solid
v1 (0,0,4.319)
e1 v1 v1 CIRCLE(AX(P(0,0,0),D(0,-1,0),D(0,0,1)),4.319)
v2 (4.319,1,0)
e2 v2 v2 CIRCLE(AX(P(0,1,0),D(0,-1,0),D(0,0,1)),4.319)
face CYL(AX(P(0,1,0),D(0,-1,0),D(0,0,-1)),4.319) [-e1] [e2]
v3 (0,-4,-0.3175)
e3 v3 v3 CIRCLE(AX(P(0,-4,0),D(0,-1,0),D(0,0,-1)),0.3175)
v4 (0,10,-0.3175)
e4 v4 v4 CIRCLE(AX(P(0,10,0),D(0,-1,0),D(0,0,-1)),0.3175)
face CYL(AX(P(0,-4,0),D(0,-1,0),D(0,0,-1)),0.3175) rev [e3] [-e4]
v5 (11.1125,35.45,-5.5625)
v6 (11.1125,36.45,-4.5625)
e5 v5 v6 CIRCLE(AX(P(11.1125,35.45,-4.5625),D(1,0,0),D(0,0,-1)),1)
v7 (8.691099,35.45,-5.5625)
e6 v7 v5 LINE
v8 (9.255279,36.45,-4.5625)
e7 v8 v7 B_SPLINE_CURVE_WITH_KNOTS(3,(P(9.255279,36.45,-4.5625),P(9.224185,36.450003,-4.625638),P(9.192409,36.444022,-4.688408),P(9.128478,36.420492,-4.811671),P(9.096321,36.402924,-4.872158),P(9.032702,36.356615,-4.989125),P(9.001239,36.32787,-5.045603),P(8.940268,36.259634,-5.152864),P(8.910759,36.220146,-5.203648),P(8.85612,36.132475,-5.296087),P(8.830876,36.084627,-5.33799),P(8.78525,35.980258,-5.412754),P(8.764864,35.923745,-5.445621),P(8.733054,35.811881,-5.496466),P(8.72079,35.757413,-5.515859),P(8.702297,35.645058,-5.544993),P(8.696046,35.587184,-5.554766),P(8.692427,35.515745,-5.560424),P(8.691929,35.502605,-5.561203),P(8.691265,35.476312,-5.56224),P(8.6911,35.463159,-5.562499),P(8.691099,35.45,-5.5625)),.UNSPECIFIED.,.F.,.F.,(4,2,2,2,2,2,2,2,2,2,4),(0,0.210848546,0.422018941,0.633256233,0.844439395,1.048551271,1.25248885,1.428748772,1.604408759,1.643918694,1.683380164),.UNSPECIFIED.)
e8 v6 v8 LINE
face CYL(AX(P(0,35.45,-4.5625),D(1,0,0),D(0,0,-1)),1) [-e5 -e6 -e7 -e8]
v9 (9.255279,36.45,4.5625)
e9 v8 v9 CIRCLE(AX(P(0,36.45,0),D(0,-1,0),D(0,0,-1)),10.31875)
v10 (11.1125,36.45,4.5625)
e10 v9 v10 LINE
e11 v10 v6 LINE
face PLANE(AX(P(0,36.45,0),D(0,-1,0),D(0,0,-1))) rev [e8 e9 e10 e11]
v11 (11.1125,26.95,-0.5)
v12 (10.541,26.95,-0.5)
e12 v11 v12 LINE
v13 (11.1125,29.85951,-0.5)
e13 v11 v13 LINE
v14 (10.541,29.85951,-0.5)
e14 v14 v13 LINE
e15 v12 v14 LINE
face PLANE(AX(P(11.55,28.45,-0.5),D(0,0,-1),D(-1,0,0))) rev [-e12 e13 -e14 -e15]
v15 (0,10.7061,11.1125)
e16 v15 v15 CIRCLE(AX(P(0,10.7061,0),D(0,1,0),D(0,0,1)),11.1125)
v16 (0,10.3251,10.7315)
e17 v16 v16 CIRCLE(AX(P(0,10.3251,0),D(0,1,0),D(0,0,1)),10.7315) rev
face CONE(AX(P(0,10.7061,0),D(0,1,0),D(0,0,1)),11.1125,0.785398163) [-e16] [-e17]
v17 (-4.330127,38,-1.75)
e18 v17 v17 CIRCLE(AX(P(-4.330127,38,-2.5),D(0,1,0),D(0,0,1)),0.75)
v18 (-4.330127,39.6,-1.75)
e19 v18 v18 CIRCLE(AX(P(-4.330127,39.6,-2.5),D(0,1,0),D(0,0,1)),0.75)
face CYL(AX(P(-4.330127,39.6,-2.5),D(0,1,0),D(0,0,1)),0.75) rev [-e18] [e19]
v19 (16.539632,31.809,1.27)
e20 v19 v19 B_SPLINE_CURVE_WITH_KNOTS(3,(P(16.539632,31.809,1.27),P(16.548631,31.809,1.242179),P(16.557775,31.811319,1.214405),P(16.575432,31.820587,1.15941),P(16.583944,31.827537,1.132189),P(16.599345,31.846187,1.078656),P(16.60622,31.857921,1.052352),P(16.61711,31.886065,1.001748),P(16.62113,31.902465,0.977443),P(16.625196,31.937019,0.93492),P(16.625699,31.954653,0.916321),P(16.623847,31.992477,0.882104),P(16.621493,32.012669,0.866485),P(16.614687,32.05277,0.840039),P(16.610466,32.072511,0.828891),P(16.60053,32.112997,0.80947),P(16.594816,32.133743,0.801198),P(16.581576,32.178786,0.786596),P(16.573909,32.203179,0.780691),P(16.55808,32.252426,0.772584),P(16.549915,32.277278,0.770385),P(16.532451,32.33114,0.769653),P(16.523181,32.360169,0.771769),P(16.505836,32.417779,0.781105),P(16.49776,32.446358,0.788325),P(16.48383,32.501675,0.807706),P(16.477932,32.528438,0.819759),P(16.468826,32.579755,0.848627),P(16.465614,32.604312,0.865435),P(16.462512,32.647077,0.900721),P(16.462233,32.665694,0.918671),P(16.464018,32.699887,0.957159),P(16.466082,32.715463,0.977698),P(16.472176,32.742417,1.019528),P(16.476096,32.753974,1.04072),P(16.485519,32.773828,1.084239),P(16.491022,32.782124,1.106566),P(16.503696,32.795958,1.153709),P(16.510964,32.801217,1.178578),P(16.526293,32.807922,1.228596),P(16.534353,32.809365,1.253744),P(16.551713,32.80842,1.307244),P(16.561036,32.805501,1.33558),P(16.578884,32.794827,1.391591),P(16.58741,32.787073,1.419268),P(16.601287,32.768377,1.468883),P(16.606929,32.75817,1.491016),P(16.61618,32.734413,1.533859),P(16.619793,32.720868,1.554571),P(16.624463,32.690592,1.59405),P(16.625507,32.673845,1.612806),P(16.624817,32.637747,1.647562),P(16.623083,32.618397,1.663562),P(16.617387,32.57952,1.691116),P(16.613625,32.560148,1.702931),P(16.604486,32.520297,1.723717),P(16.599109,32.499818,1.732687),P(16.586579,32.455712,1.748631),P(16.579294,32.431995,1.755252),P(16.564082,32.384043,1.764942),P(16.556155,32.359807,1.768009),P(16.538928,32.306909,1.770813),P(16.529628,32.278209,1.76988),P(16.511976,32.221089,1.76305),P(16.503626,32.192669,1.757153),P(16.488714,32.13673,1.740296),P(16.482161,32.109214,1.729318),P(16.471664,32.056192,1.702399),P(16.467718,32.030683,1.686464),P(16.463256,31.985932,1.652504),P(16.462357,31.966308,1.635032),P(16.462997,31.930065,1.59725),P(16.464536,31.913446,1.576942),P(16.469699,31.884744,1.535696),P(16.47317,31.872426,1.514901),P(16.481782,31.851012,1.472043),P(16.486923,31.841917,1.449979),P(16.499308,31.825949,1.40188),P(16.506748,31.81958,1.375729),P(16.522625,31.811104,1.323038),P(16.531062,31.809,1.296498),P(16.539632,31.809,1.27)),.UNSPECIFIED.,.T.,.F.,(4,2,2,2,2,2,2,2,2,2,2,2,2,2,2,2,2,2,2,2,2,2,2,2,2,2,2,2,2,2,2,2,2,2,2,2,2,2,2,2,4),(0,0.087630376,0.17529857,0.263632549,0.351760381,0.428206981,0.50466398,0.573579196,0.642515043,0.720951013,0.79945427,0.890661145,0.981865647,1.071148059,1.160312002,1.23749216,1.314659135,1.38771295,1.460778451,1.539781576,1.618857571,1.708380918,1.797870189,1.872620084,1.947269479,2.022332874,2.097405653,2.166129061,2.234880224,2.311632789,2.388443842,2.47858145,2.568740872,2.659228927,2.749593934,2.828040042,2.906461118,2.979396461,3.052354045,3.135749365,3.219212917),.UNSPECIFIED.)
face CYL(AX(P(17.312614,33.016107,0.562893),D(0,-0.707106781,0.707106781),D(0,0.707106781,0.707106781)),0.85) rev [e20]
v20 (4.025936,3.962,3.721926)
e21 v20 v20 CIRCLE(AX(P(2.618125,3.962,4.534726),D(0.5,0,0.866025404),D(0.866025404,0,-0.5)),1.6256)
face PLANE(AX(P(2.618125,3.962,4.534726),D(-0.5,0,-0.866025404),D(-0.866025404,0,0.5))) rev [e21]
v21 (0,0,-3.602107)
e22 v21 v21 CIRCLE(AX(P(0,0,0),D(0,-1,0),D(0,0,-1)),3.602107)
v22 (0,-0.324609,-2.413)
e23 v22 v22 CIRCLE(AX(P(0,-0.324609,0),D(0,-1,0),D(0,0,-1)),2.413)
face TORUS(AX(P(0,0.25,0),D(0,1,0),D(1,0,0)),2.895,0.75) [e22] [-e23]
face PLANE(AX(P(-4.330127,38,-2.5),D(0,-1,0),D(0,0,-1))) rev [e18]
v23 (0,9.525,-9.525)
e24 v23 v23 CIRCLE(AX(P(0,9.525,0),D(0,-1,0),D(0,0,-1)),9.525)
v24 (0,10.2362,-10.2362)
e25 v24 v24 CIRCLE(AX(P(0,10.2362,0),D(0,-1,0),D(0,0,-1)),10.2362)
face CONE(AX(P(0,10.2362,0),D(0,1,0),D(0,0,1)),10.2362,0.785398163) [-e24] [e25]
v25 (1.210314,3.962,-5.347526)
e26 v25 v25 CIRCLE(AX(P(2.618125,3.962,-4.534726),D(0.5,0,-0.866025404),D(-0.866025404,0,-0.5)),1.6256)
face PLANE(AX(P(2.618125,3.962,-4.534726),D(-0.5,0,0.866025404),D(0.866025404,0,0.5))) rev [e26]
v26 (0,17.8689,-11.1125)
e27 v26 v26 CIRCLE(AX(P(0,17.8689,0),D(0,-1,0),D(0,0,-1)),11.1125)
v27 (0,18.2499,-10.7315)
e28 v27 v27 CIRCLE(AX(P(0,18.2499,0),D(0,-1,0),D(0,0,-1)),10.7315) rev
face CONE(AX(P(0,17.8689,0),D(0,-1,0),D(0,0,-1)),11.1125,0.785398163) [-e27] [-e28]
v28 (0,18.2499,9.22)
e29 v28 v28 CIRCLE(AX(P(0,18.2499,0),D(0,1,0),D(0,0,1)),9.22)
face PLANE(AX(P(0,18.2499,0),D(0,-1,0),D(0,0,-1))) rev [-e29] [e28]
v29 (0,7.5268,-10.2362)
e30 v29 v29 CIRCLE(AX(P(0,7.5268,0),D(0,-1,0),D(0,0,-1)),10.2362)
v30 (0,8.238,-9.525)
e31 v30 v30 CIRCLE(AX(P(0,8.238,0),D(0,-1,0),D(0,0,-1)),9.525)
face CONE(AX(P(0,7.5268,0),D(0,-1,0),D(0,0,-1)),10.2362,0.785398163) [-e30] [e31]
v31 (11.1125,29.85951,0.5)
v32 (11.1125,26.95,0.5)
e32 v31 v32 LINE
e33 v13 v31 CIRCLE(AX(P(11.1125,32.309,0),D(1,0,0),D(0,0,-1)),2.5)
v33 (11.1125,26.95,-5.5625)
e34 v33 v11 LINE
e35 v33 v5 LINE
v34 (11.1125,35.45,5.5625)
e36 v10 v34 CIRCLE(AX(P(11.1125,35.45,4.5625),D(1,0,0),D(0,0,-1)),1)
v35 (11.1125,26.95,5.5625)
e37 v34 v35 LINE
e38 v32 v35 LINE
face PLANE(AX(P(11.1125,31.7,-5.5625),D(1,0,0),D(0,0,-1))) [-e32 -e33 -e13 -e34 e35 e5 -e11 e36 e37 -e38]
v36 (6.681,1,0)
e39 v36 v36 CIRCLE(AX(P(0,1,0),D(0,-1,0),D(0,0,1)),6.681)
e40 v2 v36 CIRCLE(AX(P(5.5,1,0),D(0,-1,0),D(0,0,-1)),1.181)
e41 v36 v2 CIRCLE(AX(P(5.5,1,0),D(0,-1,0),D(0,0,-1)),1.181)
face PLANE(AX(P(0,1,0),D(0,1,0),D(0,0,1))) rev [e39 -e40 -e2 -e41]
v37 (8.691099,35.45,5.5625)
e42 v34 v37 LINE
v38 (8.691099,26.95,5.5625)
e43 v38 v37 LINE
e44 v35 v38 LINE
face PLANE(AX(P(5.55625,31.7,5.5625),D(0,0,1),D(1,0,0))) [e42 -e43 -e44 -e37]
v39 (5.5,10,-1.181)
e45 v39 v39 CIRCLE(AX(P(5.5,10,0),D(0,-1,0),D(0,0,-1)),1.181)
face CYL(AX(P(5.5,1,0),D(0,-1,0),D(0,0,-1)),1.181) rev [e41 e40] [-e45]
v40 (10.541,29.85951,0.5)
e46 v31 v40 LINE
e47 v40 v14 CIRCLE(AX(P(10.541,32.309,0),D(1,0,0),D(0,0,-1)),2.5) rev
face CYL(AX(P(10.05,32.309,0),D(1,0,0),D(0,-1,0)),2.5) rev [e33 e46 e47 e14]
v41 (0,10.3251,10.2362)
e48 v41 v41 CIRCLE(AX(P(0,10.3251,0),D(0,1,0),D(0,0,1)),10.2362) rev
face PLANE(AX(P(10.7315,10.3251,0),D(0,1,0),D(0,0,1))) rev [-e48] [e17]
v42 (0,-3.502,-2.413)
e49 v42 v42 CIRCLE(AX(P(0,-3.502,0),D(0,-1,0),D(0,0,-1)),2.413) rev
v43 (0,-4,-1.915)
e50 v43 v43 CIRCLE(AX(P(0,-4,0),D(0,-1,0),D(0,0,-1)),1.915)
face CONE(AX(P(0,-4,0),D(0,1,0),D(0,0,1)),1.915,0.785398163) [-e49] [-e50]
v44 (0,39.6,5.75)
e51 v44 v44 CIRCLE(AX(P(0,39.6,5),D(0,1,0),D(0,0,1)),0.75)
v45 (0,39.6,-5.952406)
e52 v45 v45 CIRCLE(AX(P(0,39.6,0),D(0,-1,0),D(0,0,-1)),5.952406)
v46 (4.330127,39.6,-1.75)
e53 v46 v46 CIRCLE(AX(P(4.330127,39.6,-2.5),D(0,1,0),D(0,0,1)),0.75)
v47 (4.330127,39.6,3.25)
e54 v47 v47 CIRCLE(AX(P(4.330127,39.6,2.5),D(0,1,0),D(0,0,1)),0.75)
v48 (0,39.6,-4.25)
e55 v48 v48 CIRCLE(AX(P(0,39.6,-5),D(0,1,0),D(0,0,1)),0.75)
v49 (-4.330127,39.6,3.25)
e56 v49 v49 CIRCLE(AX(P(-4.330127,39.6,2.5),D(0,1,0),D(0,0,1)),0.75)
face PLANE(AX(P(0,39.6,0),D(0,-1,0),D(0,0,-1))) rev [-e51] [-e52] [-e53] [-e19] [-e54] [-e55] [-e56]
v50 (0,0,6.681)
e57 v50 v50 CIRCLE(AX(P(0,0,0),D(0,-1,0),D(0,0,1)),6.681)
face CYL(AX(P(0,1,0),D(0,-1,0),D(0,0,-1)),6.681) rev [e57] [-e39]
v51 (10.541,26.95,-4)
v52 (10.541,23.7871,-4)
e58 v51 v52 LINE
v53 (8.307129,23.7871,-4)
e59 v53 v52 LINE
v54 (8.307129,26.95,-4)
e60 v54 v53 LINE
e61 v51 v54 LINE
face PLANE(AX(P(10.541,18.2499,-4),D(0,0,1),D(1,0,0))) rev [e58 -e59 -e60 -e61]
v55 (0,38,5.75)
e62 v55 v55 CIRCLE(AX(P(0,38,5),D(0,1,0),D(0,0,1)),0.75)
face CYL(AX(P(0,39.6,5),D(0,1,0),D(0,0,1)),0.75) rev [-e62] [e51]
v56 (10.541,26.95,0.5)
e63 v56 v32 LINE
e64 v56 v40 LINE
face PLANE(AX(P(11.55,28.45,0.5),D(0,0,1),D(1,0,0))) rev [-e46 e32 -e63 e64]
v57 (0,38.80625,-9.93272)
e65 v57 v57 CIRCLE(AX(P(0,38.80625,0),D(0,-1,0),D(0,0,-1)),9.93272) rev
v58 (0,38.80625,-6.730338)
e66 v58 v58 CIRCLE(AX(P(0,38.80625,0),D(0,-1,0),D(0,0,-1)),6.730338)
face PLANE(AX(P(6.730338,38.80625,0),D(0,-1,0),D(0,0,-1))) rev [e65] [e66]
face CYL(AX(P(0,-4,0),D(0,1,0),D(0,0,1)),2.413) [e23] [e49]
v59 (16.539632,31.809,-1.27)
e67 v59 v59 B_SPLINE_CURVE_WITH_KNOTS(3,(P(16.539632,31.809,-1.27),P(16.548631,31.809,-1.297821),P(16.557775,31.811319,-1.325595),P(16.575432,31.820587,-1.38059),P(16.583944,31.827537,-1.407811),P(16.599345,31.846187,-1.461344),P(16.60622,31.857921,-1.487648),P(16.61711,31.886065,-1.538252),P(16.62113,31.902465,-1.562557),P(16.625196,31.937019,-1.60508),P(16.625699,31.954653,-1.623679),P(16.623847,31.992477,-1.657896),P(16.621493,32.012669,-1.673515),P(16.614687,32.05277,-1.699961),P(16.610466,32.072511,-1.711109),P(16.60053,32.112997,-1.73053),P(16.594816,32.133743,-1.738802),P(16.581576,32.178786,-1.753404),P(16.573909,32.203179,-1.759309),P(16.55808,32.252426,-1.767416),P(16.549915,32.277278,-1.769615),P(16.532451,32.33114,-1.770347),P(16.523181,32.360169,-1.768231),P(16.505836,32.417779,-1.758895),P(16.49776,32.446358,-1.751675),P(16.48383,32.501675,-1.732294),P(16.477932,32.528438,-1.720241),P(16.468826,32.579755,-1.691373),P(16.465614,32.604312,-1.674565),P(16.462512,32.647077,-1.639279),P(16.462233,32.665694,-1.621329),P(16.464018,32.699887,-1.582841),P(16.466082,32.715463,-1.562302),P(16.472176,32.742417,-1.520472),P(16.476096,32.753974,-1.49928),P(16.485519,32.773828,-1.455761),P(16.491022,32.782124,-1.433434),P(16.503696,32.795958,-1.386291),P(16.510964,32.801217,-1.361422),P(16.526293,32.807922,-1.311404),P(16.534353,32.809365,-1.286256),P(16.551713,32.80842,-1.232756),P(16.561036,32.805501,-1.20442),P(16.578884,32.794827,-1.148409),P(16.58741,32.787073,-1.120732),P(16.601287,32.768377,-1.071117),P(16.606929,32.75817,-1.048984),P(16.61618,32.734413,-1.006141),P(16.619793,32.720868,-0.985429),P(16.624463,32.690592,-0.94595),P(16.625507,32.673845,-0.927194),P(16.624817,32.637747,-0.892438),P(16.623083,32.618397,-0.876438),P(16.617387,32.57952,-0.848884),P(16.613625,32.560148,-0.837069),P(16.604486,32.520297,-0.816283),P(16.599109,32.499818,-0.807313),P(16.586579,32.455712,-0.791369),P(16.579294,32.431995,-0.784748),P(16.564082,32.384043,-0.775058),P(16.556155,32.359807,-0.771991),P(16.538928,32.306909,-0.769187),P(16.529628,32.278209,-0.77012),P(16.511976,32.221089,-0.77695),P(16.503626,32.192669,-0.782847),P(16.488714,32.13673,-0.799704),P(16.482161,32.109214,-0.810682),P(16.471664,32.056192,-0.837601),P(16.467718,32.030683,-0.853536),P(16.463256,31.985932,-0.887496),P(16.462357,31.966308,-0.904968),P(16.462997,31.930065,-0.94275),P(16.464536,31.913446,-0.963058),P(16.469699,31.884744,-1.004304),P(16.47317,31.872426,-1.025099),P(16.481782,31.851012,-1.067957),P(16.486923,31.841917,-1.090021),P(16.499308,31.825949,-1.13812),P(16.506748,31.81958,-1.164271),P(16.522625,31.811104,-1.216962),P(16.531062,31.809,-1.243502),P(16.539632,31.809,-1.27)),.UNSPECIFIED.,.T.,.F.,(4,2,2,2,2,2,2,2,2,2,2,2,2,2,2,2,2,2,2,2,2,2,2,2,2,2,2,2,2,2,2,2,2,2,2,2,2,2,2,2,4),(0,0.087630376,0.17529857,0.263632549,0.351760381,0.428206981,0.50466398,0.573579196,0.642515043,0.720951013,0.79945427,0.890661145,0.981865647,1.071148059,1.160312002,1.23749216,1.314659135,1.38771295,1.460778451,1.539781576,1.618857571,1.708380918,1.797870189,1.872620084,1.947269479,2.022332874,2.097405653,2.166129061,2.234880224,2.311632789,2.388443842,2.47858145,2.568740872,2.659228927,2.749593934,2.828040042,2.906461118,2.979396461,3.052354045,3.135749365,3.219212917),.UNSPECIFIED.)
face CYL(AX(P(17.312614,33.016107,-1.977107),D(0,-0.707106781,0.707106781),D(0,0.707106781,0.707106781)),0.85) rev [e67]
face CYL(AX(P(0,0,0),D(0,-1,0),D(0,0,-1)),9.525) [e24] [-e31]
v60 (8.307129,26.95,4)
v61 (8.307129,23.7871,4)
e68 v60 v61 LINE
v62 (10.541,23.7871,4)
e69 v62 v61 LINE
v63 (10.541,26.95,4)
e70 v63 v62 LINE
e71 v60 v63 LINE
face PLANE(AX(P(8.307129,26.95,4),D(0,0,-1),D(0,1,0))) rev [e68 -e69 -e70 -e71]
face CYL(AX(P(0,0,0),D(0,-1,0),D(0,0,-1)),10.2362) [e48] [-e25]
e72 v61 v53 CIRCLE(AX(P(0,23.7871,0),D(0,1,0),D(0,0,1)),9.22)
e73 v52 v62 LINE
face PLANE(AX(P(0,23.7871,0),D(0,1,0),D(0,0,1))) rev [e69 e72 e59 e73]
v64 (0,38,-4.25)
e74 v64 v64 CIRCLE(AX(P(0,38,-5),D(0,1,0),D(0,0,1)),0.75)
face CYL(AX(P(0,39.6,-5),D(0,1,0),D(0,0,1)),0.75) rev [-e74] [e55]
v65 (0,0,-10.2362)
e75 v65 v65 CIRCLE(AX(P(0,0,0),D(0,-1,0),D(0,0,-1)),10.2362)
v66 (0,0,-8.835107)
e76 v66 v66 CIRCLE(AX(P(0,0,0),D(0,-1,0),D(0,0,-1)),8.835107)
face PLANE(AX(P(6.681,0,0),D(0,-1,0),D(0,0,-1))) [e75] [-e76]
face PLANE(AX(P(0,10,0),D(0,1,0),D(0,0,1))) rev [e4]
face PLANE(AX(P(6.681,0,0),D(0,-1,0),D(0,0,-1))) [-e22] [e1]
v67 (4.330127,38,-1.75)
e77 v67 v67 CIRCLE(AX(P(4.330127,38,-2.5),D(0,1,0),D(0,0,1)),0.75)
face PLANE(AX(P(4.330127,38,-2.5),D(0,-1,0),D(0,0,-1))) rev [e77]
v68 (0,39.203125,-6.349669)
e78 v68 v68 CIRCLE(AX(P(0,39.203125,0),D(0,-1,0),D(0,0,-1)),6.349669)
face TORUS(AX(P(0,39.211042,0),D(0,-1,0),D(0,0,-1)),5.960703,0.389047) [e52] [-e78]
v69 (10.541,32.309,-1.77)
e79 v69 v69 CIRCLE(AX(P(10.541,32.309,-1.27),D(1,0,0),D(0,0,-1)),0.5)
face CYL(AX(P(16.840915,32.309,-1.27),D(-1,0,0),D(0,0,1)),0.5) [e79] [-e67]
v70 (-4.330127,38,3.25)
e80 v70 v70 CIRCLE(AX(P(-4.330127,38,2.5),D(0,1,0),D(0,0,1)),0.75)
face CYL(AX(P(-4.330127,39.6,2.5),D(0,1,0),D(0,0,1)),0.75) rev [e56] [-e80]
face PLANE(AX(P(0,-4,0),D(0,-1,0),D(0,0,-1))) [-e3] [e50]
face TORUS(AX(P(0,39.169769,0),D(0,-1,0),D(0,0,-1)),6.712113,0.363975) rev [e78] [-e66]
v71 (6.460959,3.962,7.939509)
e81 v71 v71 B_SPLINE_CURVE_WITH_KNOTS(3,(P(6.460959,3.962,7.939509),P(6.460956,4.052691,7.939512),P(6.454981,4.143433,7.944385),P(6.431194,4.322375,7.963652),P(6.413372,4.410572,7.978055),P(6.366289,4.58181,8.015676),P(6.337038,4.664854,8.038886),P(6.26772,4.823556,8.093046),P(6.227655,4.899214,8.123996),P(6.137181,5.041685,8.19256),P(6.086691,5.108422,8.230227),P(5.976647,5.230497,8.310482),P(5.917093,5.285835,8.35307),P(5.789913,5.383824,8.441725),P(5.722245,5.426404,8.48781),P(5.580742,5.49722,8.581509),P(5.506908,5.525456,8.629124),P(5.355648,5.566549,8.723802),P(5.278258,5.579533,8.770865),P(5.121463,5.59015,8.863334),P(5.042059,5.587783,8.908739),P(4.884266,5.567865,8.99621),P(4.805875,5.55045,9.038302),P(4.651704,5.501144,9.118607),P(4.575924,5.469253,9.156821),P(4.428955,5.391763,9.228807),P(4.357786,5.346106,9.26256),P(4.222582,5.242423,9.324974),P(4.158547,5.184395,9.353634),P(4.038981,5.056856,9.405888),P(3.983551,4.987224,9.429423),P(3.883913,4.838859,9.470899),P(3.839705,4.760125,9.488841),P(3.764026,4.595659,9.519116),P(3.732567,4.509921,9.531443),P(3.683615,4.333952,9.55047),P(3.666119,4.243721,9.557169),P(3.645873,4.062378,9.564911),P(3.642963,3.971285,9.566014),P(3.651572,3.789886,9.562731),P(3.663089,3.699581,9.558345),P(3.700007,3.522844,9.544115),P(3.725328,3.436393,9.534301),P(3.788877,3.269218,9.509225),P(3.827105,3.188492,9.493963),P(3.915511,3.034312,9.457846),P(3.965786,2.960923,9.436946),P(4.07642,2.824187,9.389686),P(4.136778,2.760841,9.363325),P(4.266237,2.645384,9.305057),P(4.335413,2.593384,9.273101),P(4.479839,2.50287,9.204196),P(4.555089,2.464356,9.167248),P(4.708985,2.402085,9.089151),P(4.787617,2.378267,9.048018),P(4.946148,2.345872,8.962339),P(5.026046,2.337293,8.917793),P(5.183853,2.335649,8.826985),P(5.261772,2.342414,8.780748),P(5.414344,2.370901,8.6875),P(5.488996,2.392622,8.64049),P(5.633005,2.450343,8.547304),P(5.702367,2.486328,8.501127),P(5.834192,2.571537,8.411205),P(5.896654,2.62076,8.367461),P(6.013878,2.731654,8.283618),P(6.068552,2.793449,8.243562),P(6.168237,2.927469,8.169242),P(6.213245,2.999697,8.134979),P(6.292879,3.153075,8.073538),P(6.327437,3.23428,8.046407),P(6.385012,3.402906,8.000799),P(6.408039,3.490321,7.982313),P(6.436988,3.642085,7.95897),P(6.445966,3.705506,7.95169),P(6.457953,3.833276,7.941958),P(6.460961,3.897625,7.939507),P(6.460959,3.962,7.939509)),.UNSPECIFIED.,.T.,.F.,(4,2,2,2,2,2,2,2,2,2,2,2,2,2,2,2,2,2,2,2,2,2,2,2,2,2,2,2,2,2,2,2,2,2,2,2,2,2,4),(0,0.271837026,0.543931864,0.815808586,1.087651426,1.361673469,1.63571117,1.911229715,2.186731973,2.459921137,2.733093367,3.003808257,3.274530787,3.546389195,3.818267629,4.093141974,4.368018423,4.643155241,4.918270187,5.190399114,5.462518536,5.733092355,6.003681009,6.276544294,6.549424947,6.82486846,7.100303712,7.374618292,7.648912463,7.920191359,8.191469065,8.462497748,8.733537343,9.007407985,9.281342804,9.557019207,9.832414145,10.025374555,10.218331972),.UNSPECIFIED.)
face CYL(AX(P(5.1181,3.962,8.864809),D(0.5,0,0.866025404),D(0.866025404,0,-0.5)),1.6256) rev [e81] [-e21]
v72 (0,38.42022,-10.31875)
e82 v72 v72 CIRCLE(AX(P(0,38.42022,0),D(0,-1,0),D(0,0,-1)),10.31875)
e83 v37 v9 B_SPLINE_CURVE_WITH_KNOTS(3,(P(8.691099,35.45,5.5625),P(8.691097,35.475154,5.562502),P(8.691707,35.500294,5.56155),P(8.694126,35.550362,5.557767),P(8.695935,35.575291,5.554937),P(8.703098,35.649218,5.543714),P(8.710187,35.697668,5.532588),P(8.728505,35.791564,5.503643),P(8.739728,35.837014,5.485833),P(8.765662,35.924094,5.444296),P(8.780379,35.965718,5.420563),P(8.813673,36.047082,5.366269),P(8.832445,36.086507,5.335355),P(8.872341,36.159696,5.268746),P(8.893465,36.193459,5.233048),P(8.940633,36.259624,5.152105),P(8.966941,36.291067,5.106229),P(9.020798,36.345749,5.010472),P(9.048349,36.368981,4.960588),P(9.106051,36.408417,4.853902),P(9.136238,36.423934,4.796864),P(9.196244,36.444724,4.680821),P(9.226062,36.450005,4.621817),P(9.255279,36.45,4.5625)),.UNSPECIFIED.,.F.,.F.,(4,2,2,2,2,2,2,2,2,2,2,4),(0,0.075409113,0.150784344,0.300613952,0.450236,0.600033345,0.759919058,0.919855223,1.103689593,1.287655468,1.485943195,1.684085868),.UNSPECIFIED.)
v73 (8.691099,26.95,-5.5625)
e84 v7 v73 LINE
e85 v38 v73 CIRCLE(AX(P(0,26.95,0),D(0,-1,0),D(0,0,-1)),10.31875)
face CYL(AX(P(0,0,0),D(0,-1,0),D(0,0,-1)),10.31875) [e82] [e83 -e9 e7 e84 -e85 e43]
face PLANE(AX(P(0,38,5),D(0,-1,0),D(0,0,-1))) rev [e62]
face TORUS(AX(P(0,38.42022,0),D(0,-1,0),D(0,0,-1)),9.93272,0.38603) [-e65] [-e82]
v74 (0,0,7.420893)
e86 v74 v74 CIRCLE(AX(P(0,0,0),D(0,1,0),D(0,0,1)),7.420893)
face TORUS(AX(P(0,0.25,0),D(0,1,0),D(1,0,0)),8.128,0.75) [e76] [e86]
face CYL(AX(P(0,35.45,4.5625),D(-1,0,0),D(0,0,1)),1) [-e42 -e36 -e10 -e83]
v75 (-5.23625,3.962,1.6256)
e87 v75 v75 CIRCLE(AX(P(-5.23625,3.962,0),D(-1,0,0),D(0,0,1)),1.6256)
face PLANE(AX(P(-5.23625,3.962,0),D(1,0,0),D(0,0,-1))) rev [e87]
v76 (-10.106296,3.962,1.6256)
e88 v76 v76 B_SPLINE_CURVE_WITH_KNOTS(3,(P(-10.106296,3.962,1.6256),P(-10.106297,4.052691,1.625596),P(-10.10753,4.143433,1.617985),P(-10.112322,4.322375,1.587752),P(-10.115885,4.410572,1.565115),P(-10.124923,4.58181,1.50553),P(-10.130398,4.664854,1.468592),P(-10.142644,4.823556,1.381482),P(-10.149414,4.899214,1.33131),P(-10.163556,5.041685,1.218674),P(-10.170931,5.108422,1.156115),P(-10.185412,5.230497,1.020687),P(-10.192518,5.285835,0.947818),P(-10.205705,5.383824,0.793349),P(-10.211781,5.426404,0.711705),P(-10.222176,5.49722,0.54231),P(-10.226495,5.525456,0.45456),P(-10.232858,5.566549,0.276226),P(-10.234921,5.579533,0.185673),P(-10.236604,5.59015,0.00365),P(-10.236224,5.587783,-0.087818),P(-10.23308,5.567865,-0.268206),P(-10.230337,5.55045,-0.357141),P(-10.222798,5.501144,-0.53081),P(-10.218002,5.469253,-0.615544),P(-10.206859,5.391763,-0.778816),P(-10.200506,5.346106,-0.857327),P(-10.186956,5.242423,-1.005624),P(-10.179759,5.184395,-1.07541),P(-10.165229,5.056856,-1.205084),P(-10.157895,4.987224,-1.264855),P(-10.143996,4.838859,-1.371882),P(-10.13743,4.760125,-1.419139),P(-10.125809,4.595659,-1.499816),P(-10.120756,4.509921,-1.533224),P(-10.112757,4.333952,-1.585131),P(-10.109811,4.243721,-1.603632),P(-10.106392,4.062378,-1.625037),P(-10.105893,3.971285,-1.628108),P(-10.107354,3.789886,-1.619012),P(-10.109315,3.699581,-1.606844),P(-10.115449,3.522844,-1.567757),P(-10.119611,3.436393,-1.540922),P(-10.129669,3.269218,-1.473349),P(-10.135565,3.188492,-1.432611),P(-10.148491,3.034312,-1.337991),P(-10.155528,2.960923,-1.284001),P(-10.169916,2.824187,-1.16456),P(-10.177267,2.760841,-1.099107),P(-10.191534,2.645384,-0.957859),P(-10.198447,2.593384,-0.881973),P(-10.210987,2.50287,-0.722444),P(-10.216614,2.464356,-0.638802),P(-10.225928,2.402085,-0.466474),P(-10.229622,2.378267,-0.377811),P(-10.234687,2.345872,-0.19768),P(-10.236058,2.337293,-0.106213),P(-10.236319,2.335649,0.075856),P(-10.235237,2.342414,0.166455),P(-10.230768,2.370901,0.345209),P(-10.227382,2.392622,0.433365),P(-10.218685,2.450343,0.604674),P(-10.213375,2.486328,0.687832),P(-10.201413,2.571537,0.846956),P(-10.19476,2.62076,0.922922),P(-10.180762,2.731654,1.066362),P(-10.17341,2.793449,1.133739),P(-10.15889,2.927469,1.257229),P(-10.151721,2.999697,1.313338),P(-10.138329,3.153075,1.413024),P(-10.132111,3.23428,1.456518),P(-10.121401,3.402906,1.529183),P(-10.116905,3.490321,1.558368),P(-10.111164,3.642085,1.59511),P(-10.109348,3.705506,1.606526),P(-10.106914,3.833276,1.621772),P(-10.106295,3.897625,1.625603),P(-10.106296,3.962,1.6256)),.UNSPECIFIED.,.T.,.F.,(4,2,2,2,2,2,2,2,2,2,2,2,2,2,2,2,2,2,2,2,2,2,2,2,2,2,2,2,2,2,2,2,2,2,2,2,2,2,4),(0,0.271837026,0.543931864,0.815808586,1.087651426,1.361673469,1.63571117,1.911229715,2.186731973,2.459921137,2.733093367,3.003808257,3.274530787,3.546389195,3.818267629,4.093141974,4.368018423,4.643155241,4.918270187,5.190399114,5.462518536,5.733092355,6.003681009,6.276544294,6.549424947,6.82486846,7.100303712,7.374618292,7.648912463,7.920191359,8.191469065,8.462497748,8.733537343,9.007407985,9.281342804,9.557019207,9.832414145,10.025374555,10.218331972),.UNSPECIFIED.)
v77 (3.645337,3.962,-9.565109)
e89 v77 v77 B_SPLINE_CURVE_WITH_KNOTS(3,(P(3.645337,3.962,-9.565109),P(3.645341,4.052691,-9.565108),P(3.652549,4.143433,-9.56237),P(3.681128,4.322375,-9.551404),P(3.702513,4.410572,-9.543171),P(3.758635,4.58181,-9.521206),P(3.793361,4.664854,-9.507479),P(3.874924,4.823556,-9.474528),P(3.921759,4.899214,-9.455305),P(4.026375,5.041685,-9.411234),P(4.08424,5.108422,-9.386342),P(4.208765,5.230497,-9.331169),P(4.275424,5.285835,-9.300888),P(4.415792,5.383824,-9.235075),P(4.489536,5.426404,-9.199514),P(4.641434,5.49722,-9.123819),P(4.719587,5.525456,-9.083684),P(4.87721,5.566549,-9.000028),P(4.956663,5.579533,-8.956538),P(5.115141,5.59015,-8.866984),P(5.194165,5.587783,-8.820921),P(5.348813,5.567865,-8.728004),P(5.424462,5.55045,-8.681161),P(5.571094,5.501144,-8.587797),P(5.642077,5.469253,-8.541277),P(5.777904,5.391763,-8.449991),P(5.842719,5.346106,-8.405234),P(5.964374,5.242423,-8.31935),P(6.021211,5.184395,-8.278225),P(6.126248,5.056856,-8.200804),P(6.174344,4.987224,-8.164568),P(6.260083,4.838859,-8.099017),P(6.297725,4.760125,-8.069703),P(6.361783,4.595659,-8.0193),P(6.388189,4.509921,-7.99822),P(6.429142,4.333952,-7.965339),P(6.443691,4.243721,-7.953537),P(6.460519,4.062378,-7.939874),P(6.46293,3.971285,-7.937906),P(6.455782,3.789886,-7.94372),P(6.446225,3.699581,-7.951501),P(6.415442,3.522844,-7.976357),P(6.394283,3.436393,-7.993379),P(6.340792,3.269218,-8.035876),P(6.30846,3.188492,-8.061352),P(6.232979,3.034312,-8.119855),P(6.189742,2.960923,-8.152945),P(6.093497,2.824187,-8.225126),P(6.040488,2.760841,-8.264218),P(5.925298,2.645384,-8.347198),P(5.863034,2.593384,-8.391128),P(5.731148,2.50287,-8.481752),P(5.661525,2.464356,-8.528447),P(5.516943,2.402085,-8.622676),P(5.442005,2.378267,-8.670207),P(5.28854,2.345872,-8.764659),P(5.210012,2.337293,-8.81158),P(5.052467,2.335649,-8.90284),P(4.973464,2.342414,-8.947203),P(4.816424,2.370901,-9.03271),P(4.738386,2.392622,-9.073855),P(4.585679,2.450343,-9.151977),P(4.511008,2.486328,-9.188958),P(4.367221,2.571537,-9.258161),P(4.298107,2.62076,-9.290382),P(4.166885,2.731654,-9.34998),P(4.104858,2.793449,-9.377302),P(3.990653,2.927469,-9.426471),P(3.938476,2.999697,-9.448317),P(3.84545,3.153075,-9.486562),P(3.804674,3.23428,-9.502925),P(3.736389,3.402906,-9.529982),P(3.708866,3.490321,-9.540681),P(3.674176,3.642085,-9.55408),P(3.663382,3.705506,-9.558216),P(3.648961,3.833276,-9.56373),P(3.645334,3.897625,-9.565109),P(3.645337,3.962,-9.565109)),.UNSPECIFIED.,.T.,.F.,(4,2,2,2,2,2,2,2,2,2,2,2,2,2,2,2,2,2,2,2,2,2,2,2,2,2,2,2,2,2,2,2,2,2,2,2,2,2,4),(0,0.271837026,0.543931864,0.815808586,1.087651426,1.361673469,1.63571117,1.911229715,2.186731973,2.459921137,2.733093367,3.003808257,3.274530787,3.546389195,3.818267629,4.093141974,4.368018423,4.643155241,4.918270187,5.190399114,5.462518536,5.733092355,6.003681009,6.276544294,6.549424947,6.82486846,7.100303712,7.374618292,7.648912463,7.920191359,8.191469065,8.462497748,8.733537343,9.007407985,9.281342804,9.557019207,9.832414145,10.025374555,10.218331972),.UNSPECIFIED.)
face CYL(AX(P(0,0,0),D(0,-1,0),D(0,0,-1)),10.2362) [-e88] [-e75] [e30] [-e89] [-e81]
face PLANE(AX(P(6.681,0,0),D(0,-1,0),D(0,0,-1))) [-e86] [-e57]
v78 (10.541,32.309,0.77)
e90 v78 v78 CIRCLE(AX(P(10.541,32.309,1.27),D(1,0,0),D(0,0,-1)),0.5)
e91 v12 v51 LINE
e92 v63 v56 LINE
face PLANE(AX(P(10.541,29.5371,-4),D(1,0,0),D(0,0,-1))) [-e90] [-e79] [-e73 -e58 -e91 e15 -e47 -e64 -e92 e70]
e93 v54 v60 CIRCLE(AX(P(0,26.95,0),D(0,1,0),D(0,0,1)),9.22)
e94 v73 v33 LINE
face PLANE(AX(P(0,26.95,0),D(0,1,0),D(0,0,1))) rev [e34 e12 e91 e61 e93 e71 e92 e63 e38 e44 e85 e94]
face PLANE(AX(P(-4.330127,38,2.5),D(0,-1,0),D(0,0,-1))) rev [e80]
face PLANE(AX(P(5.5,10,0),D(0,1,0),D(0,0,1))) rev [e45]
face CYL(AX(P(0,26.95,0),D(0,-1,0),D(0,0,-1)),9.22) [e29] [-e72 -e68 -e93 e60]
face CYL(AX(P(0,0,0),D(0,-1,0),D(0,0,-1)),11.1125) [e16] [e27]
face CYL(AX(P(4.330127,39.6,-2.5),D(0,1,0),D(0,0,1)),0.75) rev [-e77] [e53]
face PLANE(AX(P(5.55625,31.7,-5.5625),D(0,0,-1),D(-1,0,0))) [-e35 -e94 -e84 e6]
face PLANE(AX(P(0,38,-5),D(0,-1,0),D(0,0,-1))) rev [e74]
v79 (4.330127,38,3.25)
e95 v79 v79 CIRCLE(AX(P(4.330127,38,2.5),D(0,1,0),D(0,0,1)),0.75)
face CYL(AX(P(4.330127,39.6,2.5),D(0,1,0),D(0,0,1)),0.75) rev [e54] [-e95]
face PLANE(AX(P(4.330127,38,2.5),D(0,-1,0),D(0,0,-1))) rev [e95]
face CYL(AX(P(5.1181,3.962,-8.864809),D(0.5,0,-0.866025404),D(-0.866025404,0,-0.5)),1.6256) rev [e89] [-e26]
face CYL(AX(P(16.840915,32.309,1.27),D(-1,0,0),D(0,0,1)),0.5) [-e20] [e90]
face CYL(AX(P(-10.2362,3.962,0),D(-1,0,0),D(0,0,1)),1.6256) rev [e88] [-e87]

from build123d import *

# Parameters (mm, degrees)
CUT_EXTRUDE1_START             = -29.859510257
CUT_EXTRUDE1_OUTLINE_R         = 9.525
CUT_EXTRUDE1_DEPTH             = 38.80625
CUT_EXTRUDE1_START_2           = -19.623310357
CUT_EXTRUDE1_2_OUTLINE_R       = 10.2362
CUT_EXTRUDE1_2_OUTLINE_R_2     = 9.525
CUT_EXTRUDE1_2_DEPTH           = 28.5700501
CUT_EXTRUDE1_START_3           = -19.534410257
CUT_EXTRUDE1_3_OUTLINE_R       = 10.2362
CUT_EXTRUDE1_3_DEPTH           = 7.9248
CUT_EXTRUDE1_4_OUTLINE_R       = 10.2362
CUT_EXTRUDE1_4_OUTLINE_R_2     = 9.525
CUT_EXTRUDE1_4_DEPTH           = 7.5267999
CUT_EXTRUDE1_START_4           = -11.609610257
CUT_EXTRUDE1_5_OUTLINE_R       = 10.2362
CUT_EXTRUDE1_5_DEPTH           = 11.609610257
CUT_EXTRUDE1_START_5           = 4.949489743
CUT_EXTRUDE1_6_OUTLINE_R       = 10.2362
CUT_EXTRUDE1_6_DEPTH           = 3.99725
CUT_EXTRUDE1_START_6           = 6.730338354
CUT_EXTRUDE1_7_DEPTH           = 4.382161646
CUT_EXTRUDE1_START_7           = 9.523588486
CUT_EXTRUDE1_8_DEPTH           = 1.017411514
CUT_EXTRUDE1_START_8           = 29.859510257
CUT_EXTRUDE1_9_DEPTH           = 4.949489743
CUT_EXTRUDE2_DEPTH             = 7.9248
SKETCH3_R                      = 6.681
SKETCH3_R_2                    = 4.319
CUT_EXTRUDE3_DEPTH             = 1
CUT_EXTRUDE4_DEPTH             = 8.7001
CUT_EXTRUDE5_START             = -2.35625
CUT_EXTRUDE5_DEPTH             = 2.35625
CUT_EXTRUDE6_DEPTH             = 7.9248
CUT_EXTRUDE7_DEPTH             = 5.5372
SKETCH8_R                      = 2.413
BOSS_EXTRUDE1_DEPTH            = 3.675390567
BOSS_EXTRUDE2_REACH            = 48.481
BOSS_EXTRUDE2_END_RADIUS       = 0.85
SKETCH9_R                      = 0.5
BOSS_EXTRUDE3_REACH            = 48.481
BOSS_EXTRUDE3_END_RADIUS       = 0.85
SKETCH10_R                     = 0.5
M2_CLEARANCE_HOLE1_D           = 2.362
M2_CLEARANCE_HOLE1_DEPTH       = 9
HOLE1_D                        = 0.635
HOLE1_DEPTH                    = 14
F_1_5_1_5_DIAMETER_HOLE1_D     = 1.5
F_1_5_1_5_DIAMETER_HOLE1_DEPTH = 1.6
M3_CLEARANCE_HOLE1_D           = 3.2512
M3_CLEARANCE_HOLE1_DEPTH       = 4.99995
M3_CLEARANCE_HOLE2_D           = 3.2512
M3_CLEARANCE_HOLE2_DEPTH       = 4.99995
M3_CLEARANCE_HOLE3_D           = 3.2512
M3_CLEARANCE_HOLE3_DEPTH       = 4.99995
CHAMFER1_SIZE                  = 0.381
CHAMFER2_SIZE                  = 0.498
FILLET1_R                      = 0.386030378
FILLET2_R                      = 1


with BuildPart() as part:
    # Cut-Extrude1: read off the stored shape, not the designer's step
    # Cut-Extrude1 outline → Cut-Extrude1 (new body)
    with BuildSketch(Plane(origin=(0, 29.859510257, 0), x_dir=(-1, 0, 0), z_dir=(0, 1, 0)).offset(CUT_EXTRUDE1_START)):
        Circle(CUT_EXTRUDE1_OUTLINE_R)
    extrude(amount=CUT_EXTRUDE1_DEPTH)

    # Cut-Extrude1 2 outline → Cut-Extrude1 2 (add)
    with BuildSketch(Plane(origin=(0, 29.859510257, 0), x_dir=(-1, 0, 0), z_dir=(0, 1, 0)).offset(CUT_EXTRUDE1_START_2)):
        Circle(CUT_EXTRUDE1_2_OUTLINE_R)
        Circle(CUT_EXTRUDE1_2_OUTLINE_R_2, mode=Mode.SUBTRACT)
    extrude(amount=CUT_EXTRUDE1_2_DEPTH)

    # Cut-Extrude1 3 outline → Cut-Extrude1 3 (add)
    with BuildSketch(Plane(origin=(0, 29.859510257, 0), x_dir=(-1, 0, 0), z_dir=(0, 1, 0)).offset(CUT_EXTRUDE1_START_3)):
        with BuildLine():
            Line((-11.101245707, -0.5), (-11.1125, -0.5))
            Line((-11.1125, -0.5), (-11.1125, -5.5625))
            Line((-11.1125, -5.5625), (-9.620096153, -5.5625))
            ThreePointArc((-9.620096153, -5.5625), (10.665398665, 3.120405033), (-11.101245707, -0.5))
        make_face()
        Circle(CUT_EXTRUDE1_3_OUTLINE_R, mode=Mode.SUBTRACT)
    extrude(amount=CUT_EXTRUDE1_3_DEPTH)

    # Cut-Extrude1 4 outline → Cut-Extrude1 4 (add)
    with BuildSketch(Plane(origin=(0, 29.859510257, 0), x_dir=(-1, 0, 0), z_dir=(0, 1, 0)).offset(CUT_EXTRUDE1_START)):
        Circle(CUT_EXTRUDE1_4_OUTLINE_R)
        Circle(CUT_EXTRUDE1_4_OUTLINE_R_2, mode=Mode.SUBTRACT)
    extrude(amount=CUT_EXTRUDE1_4_DEPTH)

    # Cut-Extrude1 5 outline → Cut-Extrude1 5 (add)
    with BuildSketch(Plane(origin=(0, 29.859510257, 0), x_dir=(-1, 0, 0), z_dir=(0, 1, 0)).offset(CUT_EXTRUDE1_START_4)):
        with BuildLine():
            Line((-10.541, -0.5), (-11.1125, -0.5))
            Line((-11.1125, -0.5), (-11.1125, -5.5625))
            Line((-11.1125, -5.5625), (-8.691098625, -5.5625))
            ThreePointArc((-8.691098625, -5.5625), (10.31875, 0), (-8.691098625, 5.5625))
            Line((-8.691098625, 5.5625), (-11.1125, 5.5625))
            Line((-11.1125, 5.5625), (-11.1125, 0.5))
            Line((-11.1125, 0.5), (-10.541, 0.5))
            Line((-10.541, 0.5), (-10.541, -0.5))
        make_face()
        Circle(CUT_EXTRUDE1_5_OUTLINE_R, mode=Mode.SUBTRACT)
    extrude(amount=CUT_EXTRUDE1_5_DEPTH)

    # Cut-Extrude1 6 outline → Cut-Extrude1 6 (add)
    with BuildSketch(Plane(origin=(0, 29.859510257, 0), x_dir=(-1, 0, 0), z_dir=(0, 1, 0)).offset(CUT_EXTRUDE1_START_5)):
        with BuildLine():
            Line((-11.1125, -5.5625), (-8.691098625, -5.5625))
            ThreePointArc((-8.691098625, -5.5625), (10.31875, 0), (-8.691098625, 5.5625))
            Line((-8.691098625, 5.5625), (-11.1125, 5.5625))
            Line((-11.1125, 5.5625), (-11.1125, -5.5625))
        make_face()
        Circle(CUT_EXTRUDE1_6_OUTLINE_R, mode=Mode.SUBTRACT)
    extrude(amount=CUT_EXTRUDE1_6_DEPTH)

    # Cut-Extrude1 7 outline → Cut-Extrude1 7 (add)
    with BuildSketch(Plane.YZ.offset(CUT_EXTRUDE1_START_6)):
        with BuildLine():
            Line((34.809, 0), (34.809, 5.5625))
            Line((34.809, 5.5625), (29.859510257, 5.5625))
            Line((29.859510257, 5.5625), (29.859510257, 0.5))
            ThreePointArc((29.859510257, 0.5), (32.560272405, 2.487340383), (34.809, 0))
        make_face()
        with BuildLine():
            Line((34.809, -5.5625), (34.809, 0))
            ThreePointArc((34.809, 0), (32.560272405, -2.487340383), (29.859510257, -0.5))
            Line((29.859510257, -0.5), (29.859510257, -5.5625))
            Line((29.859510257, -5.5625), (34.809, -5.5625))
        make_face()
    extrude(amount=CUT_EXTRUDE1_7_DEPTH)

    # Cut-Extrude1 8 outline → Cut-Extrude1 8 (add)
    with BuildSketch(Plane.YZ.offset(CUT_EXTRUDE1_START_7)):
        with BuildLine():
            ThreePointArc((29.859510257, -0.5), (34.809, 0), (29.859510257, 0.5))
            Line((29.859510257, 0.5), (29.859510257, -0.5))
        make_face()
    extrude(amount=CUT_EXTRUDE1_8_DEPTH)

    # Cut-Extrude1 9 outline → Cut-Extrude1 9 (add)
    with BuildSketch(Plane(origin=(0, 0, 0), x_dir=(1, 0, 0), z_dir=(0, 1, 0)).offset(CUT_EXTRUDE1_START_8)):
        with BuildLine():
            ThreePointArc((8.592926404, -5.5625), (-10.2362, 0), (8.592926404, 5.5625))
            Line((8.592926404, 5.5625), (8.691098625, 5.5625))
            ThreePointArc((8.691098625, 5.5625), (-10.31875, 0), (8.691098625, -5.5625))
            Line((8.691098625, -5.5625), (8.592926404, -5.5625))
        make_face()
    extrude(amount=CUT_EXTRUDE1_9_DEPTH)

    # Cut-Extrude1 10 outline → Cut-Extrude1 10 (revolve)
    with BuildSketch(Plane.XY):
        Polygon((10.2362, 7.5268), (9.525, 8.238), (9.525, 7.5267999), align=None)
        Polygon((9.525, 10.2361999), (9.525, 9.525), (10.2362, 10.2362), align=None)
        with BuildLine():
            ThreePointArc((8.609999999, -0.324609433), (8.744308814, -0.177391442), (8.835106781, 0))
            Line((8.835106781, 0), (7.420893219, 0))
            ThreePointArc((7.420893219, 0), (7.511691186, -0.177391442), (7.646000001, -0.324609433))
            Line((7.646000001, -0.324609433), (8.609999999, -0.324609433))
        make_face()
        with BuildLine():
            ThreePointArc((8.128000003, -0.5), (8.384459477, -0.454789711), (8.609999999, -0.324609433))
            Line((8.609999999, -0.324609433), (7.646000001, -0.324609433))
            ThreePointArc((7.646000001, -0.324609433), (7.871540526, -0.454789712), (8.128000003, -0.5))
        make_face()
        with BuildLine():
            ThreePointArc((3.376999999, -0.324609433), (3.511308814, -0.177391442), (3.602106781, 0))
            Line((3.602106781, 0), (0, 0))
            Line((0, 0), (0, -0.324609433))
            Line((0, -0.324609433), (2.413, -0.324609433))
            Line((2.413, -0.324609433), (3.376999999, -0.324609433))
        make_face()
        with BuildLine():
            ThreePointArc((2.895, -0.5), (3.151459475, -0.454789711), (3.376999999, -0.324609433))
            Line((3.376999999, -0.324609433), (2.413, -0.324609433))
            ThreePointArc((2.413, -0.324609433), (2.638540524, -0.454789711), (2.895, -0.5))
        make_face()
        with BuildLine():
            Line((3.602106781, 39.60008858), (3.602106781, 38.80625))
            Line((3.602106781, 38.80625), (6.693887254, 38.80625))
            ThreePointArc((6.693887254, 38.80625), (6.437149688, 38.931287401), (6.349669127, 39.203125))
            ThreePointArc((6.349669127, 39.203125), (6.23566623, 39.486273695), (5.952406329, 39.6))
            Line((5.952406329, 39.6), (3.602106781, 39.60008858))
        make_face()
        Polygon((0, 38.80625), (3.602106781, 38.80625), (3.602106781, 39.60008858), (0, 39.6), align=None)
    revolve(axis=Axis((0, 0, 0), (0, 1, 0)))

    # Cut-Extrude1 11 outline → Cut-Extrude1 11 (revolve, cut)
    with BuildSketch(Plane.XY):
        with BuildLine():
            ThreePointArc((6.693887254, 38.80625), (6.712112754, 38.805793407), (6.730338254, 38.80625))
            Line((6.730338254, 38.80625), (6.693887254, 38.80625))
        make_face()
    revolve(axis=Axis((0, 0, 0), (0, 1, 0)), mode=Mode.SUBTRACT)

    # Sketch2 → Cut-Extrude2 (cut)
    with BuildSketch(Plane.XZ.offset(-10.3251)):
        with BuildLine():
            Line((11.1125, -0.5), (11.101245707, -0.5))
            ThreePointArc((11.101245707, -0.5), (10.92581766, -2.028340381), (10.541, -3.517808302))
            Line((10.541, -3.517808302), (10.541, -4))
            Line((10.541, -4), (10.367625391, -4))
            ThreePointArc((10.367625391, -4), (10.024350587, -4.795836898), (9.620096153, -5.5625))
            Line((9.620096153, -5.5625), (11.1125, -5.5625))
            Line((11.1125, -5.5625), (11.1125, -0.5))
        make_face()
    extrude(amount=-CUT_EXTRUDE2_DEPTH, mode=Mode.SUBTRACT)

    # Sketch3 → Cut-Extrude3 (cut)
    with BuildSketch(Plane.XZ):
        with Locations(Location((0, 0, 0), (0, 0, 90))):
            Circle(SKETCH3_R)
        with Locations(Location((0, 0, 0), (0, 0, 90))):
            Circle(SKETCH3_R_2, mode=Mode.SUBTRACT)
    extrude(amount=-CUT_EXTRUDE3_DEPTH, mode=Mode.SUBTRACT)

    # Sketch4 → Cut-Extrude4 (cut)
    with BuildSketch(Plane.XZ.offset(-18.2499)):
        with BuildLine():
            Line((10.541, -4), (8.307129468, -4))
            ThreePointArc((8.307129468, -4), (-9.22, 0), (8.307129468, 4))
            Line((8.307129468, 4), (10.541, 4))
            Line((10.541, 4), (10.541, 0.5))
            Line((10.541, 0.5), (11.1125, 0.5))
            Line((11.1125, 0.5), (11.1125, 5.5625))
            Line((11.1125, 5.5625), (8.691098625, 5.5625))
            ThreePointArc((8.691098625, 5.5625), (-10.31875, 0), (8.691098625, -5.5625))
            Line((8.691098625, -5.5625), (11.1125, -5.5625))
            Line((11.1125, -5.5625), (11.1125, -0.5))
            Line((11.1125, -0.5), (10.541, -0.5))
            Line((10.541, -0.5), (10.541, -4))
        make_face()
    extrude(amount=-CUT_EXTRUDE4_DEPTH, mode=Mode.SUBTRACT)

    # Sketch5 → Cut-Extrude5 (cut)
    with BuildSketch(Plane(origin=(0, 38.80625, 0), x_dir=(-1, 0, 0), z_dir=(0, 1, 0)).offset(CUT_EXTRUDE5_START)):
        with BuildLine():
            Line((-8.691098625, 5.5625), (-11.1125, 5.5625))
            Line((-11.1125, 5.5625), (-11.1125, -5.5625))
            Line((-11.1125, -5.5625), (-8.691098625, -5.5625))
            ThreePointArc((-8.691098625, -5.5625), (-10.31875, 0), (-8.691098625, 5.5625))
        make_face()
    extrude(amount=CUT_EXTRUDE5_DEPTH, mode=Mode.SUBTRACT)

    # Sketch6 → Cut-Extrude6 (cut)
    with BuildSketch(Plane.XZ.offset(-10.3251)):
        with BuildLine():
            Line((10.541, -4), (10.541, -3.517808302))
            ThreePointArc((10.541, -3.517808302), (10.457092385, -3.759903603), (10.367625391, -4))
            Line((10.367625391, -4), (10.541, -4))
        make_face()
    extrude(amount=-CUT_EXTRUDE6_DEPTH, mode=Mode.SUBTRACT)

    # Sketch7 → Cut-Extrude7 (cut)
    with BuildSketch(Plane.XZ.offset(-18.2499)):
        with BuildLine():
            Line((10.541, 4), (8.307129468, 4))
            ThreePointArc((8.307129468, 4), (9.22, 0), (8.307129468, -4))
            Line((8.307129468, -4), (10.541, -4))
            Line((10.541, -4), (10.541, 4))
        make_face()
    extrude(amount=-CUT_EXTRUDE7_DEPTH, mode=Mode.SUBTRACT)

    # Sketch8 → Boss-Extrude1 (add)
    with BuildSketch(Plane.XZ.offset(0.324609433)):
        with Locations(Location((0, 0, 0), (0, 0, 270))):
            Circle(SKETCH8_R)
    extrude(amount=BOSS_EXTRUDE1_DEPTH)

    # Boss-Extrude2: up to this cylinder (the profile starts outside it)
    boss_extrude2_end = Plane(origin=(17.312613646, 32.309, 1.27), z_dir=(0, -0.7071067811865401, 0.7071067811865548)) * Cylinder(BOSS_EXTRUDE2_END_RADIUS, 99.662, mode=Mode.PRIVATE)
    # Sketch9 → Boss-Extrude2 (add, up to the surface)
    with BuildSketch(Plane(origin=(10.541, 0, 0), x_dir=(0, 0, -1), z_dir=(1, 0, 0)), mode=Mode.PRIVATE) as boss_extrude2_sk1:
        with Locations(Location((-1.27, 32.309, 0), (0, 0, 270))):
            Circle(SKETCH9_R)
    boss_extrude2_tool1 = extrude(boss_extrude2_sk1.sketch, amount=BOSS_EXTRUDE2_REACH, mode=Mode.PRIVATE) - boss_extrude2_end
    add(boss_extrude2_tool1.solids().sort_by_distance((10.541, 32.309, 1.27))[0])

    # Boss-Extrude3: up to this cylinder (the profile starts outside it)
    boss_extrude3_end = Plane(origin=(17.312613646, 32.309, -1.27), z_dir=(0, -0.7071067811865401, 0.7071067811865548)) * Cylinder(BOSS_EXTRUDE3_END_RADIUS, 99.662, mode=Mode.PRIVATE)
    # Sketch10 → Boss-Extrude3 (add, up to the surface)
    with BuildSketch(Plane(origin=(10.541, 0, 0), x_dir=(0, 0, -1), z_dir=(1, 0, 0)), mode=Mode.PRIVATE) as boss_extrude3_sk1:
        with Locations(Location((1.27, 32.309, 0), (0, 0, 270))):
            Circle(SKETCH10_R)
    boss_extrude3_tool1 = extrude(boss_extrude3_sk1.sketch, amount=BOSS_EXTRUDE3_REACH, mode=Mode.PRIVATE) - boss_extrude3_end
    add(boss_extrude3_tool1.solids().sort_by_distance((10.541, 32.309, -1.27))[0])

    # M2 Clearance Hole1
    with Locations(Plane(origin=(0, 1, 0), x_dir=(-1, 0, 0), z_dir=(0, -1, 0))):
        with Locations((-5.5, 0)):
            Hole(M2_CLEARANCE_HOLE1_D / 2, depth=M2_CLEARANCE_HOLE1_DEPTH)

    # Hole1
    with Locations(Plane(origin=(0, -4, 0), x_dir=(-1, 0, 0), z_dir=(0, -1, 0))):
        with Locations((0, 0)):
            Hole(HOLE1_D / 2, depth=HOLE1_DEPTH)

    # Ø1.5 (1.5) Diameter Hole1
    with Locations(Plane(origin=(0, 39.6, 0), x_dir=(1, 0, 0), z_dir=(0, 1, 0))):
        with Locations((4.330127019, 2.5), (0, 5), (-4.330127019, 2.5), (-4.330127019, -2.5), (0, -5), (4.330127019, -2.5)):
            Hole(F_1_5_1_5_DIAMETER_HOLE1_D / 2, depth=F_1_5_1_5_DIAMETER_HOLE1_DEPTH)

    # M3 Clearance Hole1
    with Locations(Plane(origin=(-10.2362, 3.962, 0), x_dir=(0, 0, -1), z_dir=(-1, 0, 0))):
        with Locations((0, 0)):
            Hole(M3_CLEARANCE_HOLE1_D / 2, depth=M3_CLEARANCE_HOLE1_DEPTH)

    # M3 Clearance Hole2
    with Locations(Plane(origin=(5.1181, 3.962, -8.864809238), x_dir=(-0.866025403784, 0, -0.5), z_dir=(0.5, 0, -0.866025403784))):
        with Locations((0, 0)):
            Hole(M3_CLEARANCE_HOLE2_D / 2, depth=M3_CLEARANCE_HOLE2_DEPTH)

    # M3 Clearance Hole3
    with Locations(Plane(origin=(5.1181, 3.962, 8.864809238), x_dir=(0.866025403784, 0, -0.5), z_dir=(0.5, 0, 0.866025403784))):
        with Locations((0, 0)):
            Hole(M3_CLEARANCE_HOLE3_D / 2, depth=M3_CLEARANCE_HOLE3_DEPTH)

    # Chamfer1
    chamfer1_edges = [part.edges().sort_by_distance(p)[0] for p in [
        (-11.078700497, 18.249900001, 0.866055168),
        (-10.665398665, 10.3251, 3.120405033),
    ]]
    chamfer(chamfer1_edges, length=CHAMFER1_SIZE)

    # Chamfer2
    chamfer2_edges = [part.edges().sort_by_distance(p)[0] for p in [
        (0, -4, 2.413),
    ]]
    chamfer(chamfer2_edges, length=CHAMFER2_SIZE)

    # Fillet1
    fillet1_edges = [part.edges().sort_by_distance(p)[0] for p in [
        (-10.31875, 38.80625, 0),
    ]]
    fillet(fillet1_edges, radius=FILLET1_R)

    # Fillet2
    # the kernel refuses this fillet: 1 mm, written as the material it takes off along each edge
    with BuildSketch(Plane(origin=(13.6125, 36.45, -5.5625), x_dir=(0, -1, 0), z_dir=(-1, 0, 0))) as fillet2_piece_1_section:
        with BuildLine():
            CenterArc((FILLET2_R, FILLET2_R), FILLET2_R, 180, 90)
            Line((0, FILLET2_R), (0, 0))
            Line((0, 0), (FILLET2_R, 0))
        make_face()
    fillet2_piece_1 = extrude(amount=7.421401375, mode=Mode.PRIVATE)
    fillet2_piece_1 = fillet2_piece_1 - Plane(origin=(0, 36.45, 0), x_dir=(0.8422627377489024, 0, -0.5390672319847718), z_dir=(0, -1, 0)) * Cylinder(10.31875, 19, mode=Mode.PRIVATE)
    add(fillet2_piece_1, mode=Mode.SUBTRACT)
    with BuildSketch(Plane(origin=(6.191098625, 36.45, 5.5625), x_dir=(0, -1, 0), z_dir=(1, 0, 0))) as fillet2_piece_2_section:
        with BuildLine():
            CenterArc((FILLET2_R, FILLET2_R), FILLET2_R, 180, 90)
            Line((0, FILLET2_R), (0, 0))
            Line((0, 0), (FILLET2_R, 0))
        make_face()
    fillet2_piece_2 = extrude(amount=7.421401375, mode=Mode.PRIVATE)
    fillet2_piece_2 = fillet2_piece_2 - Plane(origin=(0, 36.45, 0), x_dir=(0.8422627377489024, 0, -0.5390672319847718), z_dir=(0, -1, 0)) * Cylinder(10.31875, 19, mode=Mode.PRIVATE)
    add(fillet2_piece_2, mode=Mode.SUBTRACT)


solid = part.part
